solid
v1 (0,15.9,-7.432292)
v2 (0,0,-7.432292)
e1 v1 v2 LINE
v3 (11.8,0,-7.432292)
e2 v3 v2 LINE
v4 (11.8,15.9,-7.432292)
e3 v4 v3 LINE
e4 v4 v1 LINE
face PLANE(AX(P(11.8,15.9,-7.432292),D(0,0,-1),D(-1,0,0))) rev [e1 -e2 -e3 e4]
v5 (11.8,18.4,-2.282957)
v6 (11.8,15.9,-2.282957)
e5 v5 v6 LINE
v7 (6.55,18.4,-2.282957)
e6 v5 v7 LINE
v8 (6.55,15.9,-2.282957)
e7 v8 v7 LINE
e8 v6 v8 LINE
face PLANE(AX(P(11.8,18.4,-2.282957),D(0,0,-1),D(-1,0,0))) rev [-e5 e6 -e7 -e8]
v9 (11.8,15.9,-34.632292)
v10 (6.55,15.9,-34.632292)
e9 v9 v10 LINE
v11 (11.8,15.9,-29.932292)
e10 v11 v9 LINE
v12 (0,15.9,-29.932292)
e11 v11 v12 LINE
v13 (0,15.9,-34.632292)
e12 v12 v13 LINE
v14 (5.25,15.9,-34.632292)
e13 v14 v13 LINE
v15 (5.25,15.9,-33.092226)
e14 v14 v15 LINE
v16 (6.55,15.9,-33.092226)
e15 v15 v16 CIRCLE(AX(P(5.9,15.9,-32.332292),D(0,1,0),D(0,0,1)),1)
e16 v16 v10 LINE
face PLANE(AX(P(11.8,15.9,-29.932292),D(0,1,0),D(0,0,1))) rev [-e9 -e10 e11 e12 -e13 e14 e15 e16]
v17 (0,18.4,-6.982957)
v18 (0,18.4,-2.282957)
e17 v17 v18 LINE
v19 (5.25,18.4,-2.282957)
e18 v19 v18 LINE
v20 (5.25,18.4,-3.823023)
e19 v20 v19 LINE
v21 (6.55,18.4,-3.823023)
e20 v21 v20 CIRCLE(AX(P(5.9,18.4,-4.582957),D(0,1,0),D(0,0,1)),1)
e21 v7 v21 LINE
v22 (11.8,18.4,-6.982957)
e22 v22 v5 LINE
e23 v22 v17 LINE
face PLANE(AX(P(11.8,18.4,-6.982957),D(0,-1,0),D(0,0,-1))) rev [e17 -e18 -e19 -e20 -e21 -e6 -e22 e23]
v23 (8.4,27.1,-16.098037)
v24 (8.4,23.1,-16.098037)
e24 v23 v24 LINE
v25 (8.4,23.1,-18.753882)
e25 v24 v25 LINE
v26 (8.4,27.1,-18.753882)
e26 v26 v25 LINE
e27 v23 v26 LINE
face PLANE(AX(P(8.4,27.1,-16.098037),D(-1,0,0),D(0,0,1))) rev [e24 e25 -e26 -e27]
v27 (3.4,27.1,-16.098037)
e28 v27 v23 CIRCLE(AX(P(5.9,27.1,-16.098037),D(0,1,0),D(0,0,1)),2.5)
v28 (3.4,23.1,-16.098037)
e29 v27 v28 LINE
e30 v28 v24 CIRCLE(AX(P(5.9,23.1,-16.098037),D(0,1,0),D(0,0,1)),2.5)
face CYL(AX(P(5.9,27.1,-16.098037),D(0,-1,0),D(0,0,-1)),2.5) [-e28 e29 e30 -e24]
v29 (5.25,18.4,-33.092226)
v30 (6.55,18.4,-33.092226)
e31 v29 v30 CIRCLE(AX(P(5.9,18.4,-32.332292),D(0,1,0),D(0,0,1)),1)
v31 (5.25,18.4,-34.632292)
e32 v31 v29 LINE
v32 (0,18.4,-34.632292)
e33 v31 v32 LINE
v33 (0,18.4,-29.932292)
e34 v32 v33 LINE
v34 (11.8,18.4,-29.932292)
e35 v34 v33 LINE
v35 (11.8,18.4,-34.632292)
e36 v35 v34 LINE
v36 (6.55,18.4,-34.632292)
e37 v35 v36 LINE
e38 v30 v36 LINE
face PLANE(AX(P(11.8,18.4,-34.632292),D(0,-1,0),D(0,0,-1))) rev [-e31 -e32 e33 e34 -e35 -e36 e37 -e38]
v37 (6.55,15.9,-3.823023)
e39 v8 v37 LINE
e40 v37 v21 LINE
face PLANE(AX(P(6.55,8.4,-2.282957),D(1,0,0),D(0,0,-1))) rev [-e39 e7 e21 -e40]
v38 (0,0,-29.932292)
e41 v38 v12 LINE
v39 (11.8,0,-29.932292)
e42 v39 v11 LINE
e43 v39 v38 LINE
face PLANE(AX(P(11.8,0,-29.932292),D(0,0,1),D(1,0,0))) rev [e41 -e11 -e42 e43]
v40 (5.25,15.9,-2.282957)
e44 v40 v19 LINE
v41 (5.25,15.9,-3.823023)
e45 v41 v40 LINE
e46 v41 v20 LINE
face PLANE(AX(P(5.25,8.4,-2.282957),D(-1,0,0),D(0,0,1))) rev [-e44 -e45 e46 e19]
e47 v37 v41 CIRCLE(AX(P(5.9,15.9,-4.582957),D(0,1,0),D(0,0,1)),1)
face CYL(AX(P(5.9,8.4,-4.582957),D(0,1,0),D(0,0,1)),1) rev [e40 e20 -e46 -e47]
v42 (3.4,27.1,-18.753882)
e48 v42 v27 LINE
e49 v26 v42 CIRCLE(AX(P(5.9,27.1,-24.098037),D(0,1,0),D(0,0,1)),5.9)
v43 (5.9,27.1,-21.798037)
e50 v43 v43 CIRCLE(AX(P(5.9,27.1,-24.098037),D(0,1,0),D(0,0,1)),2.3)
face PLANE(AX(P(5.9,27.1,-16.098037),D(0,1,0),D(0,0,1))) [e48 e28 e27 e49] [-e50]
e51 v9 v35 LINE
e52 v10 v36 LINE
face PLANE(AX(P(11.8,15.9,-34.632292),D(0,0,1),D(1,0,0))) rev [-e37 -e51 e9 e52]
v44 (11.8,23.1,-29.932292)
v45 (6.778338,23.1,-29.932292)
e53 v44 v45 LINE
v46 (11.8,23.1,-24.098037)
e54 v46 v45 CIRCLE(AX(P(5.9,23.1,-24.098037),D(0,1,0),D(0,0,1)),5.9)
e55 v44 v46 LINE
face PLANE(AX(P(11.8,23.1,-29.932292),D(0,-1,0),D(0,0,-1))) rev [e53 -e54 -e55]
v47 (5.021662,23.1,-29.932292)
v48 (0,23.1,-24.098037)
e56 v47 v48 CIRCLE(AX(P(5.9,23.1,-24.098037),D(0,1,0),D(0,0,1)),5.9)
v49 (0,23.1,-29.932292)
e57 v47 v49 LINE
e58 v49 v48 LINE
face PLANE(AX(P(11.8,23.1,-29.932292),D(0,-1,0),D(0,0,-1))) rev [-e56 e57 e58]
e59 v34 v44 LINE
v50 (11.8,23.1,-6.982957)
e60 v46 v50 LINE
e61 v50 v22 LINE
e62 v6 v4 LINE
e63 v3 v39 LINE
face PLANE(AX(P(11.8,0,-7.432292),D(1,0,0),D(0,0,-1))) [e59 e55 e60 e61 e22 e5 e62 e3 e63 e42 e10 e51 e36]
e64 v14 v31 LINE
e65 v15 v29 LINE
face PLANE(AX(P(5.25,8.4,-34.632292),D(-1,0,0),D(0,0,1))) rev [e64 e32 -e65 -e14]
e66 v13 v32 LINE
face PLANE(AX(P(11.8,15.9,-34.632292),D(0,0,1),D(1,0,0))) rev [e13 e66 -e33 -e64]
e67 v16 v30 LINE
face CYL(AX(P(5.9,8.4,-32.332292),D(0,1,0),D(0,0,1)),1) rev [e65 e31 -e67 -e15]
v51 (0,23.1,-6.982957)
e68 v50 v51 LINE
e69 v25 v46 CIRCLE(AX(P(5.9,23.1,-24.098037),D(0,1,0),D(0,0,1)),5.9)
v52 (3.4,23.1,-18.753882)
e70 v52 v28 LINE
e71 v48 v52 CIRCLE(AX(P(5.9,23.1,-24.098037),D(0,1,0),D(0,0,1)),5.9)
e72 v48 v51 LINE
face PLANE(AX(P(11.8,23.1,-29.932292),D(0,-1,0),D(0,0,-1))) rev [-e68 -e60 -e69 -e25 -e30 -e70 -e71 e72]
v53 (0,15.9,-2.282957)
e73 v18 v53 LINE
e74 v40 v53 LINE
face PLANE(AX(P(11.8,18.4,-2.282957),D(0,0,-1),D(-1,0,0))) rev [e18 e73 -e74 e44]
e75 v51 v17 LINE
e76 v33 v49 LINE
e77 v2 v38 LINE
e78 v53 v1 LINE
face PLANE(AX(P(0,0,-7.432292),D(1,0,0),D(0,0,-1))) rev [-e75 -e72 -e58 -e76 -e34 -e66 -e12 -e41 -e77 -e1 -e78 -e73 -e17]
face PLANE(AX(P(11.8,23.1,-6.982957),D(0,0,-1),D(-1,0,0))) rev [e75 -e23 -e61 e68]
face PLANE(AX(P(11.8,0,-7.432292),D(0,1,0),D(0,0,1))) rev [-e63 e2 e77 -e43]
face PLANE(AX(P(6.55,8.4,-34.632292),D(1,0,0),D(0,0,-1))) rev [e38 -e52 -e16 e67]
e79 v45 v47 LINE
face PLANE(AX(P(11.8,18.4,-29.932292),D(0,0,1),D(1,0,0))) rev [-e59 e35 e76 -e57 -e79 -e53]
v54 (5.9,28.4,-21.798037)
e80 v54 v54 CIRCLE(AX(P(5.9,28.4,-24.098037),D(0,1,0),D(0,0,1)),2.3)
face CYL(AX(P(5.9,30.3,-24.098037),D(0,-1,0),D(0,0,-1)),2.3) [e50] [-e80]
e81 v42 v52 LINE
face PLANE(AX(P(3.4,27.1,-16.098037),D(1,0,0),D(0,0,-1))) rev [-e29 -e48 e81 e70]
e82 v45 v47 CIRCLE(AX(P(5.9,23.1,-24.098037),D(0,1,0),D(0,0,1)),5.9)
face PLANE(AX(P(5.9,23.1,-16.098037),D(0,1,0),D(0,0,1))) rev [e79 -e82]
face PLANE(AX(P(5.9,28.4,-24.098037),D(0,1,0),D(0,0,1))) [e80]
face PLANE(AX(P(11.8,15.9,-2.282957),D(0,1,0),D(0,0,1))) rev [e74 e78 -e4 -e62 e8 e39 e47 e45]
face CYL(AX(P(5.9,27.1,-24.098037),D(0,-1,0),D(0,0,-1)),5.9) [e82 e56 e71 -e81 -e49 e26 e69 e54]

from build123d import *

# Parameters (mm, degrees)
BOSS_EXTRUDE1_DEPTH   = 11.8
BOSS_EXTRUDE2_DEPTH   = 4
SKETCH4_R             = 2.3
BOSS_EXTRUDE3_DEPTH   = 3.2
SKETCH5_R             = 0.85
CUT_EXTRUDE1_DEPTH    = 1
CUT_EXTRUDE2_DEPTH    = 10
MOVER_START           = 28.4
MOVER_FACE2_OUTLINE_R = 2.3
MOVER_FACE2_DEPTH     = 1.9


# Read off the part's stored shape, not the designer's step: Mover face2
with BuildPart() as part:
    # Sketch2 → Boss-Extrude1 (new body)
    with BuildSketch(Plane(origin=(0, 0, 0), x_dir=(0, 0, -1), z_dir=(1, 0, 0))):
        Polygon((7.432291728, 0), (29.932291728, 0), (29.932291728, 15.9), (34.632291728, 15.9), (34.632291728, 18.4), (29.932291728, 18.4), (29.932291728, 23.1), (6.982957442, 23.1), (6.982957442, 18.4), (2.282957442, 18.4), (2.282957442, 15.9), (7.432291728, 15.9), align=None)
    extrude(amount=BOSS_EXTRUDE1_DEPTH)

    # Sketch3 → Boss-Extrude2 (add)
    with BuildSketch(Plane(origin=(0, 23.1, 0), x_dir=(-1, 0, 0), z_dir=(0, 1, 0))):
        with BuildLine():
            Line((-3.4, -16.098037438), (-3.4, -18.753881751))
            ThreePointArc((-3.4, -18.753881751), (-5.9, -29.998037438), (-8.4, -18.753881751))
            Line((-8.4, -18.753881751), (-8.4, -16.098037438))
            ThreePointArc((-8.4, -16.098037438), (-5.9, -13.598037438), (-3.4, -16.098037438))
        make_face()
    extrude(amount=BOSS_EXTRUDE2_DEPTH)

    # Sketch4 → Boss-Extrude3 (add)
    with BuildSketch(Plane(origin=(0, 27.1, 0), x_dir=(-1, 0, 0), z_dir=(0, 1, 0))):
        with Locations(Location((-5.9, -24.098037438, 0), (0, 0, 90))):
            Circle(SKETCH4_R)
    extrude(amount=BOSS_EXTRUDE3_DEPTH)

    # Sketch5 → Cut-Extrude1 (cut)
    with BuildSketch(Plane(origin=(0, 30.3, 0), x_dir=(1, 0, 0), z_dir=(0, 1, 0))):
        with Locations(Location((5.9, 24.098037438, 0), (0, 0, 270))):
            Circle(SKETCH5_R)
    extrude(amount=-CUT_EXTRUDE1_DEPTH, mode=Mode.SUBTRACT)

    # Sketch6 → Cut-Extrude2 (cut)
    with BuildSketch(Plane(origin=(0, 18.4, 0), x_dir=(1, 0, 0), z_dir=(0, 1, 0))):
        with BuildLine():
            Line((6.55, 2.282957442), (5.25, 2.282957442))
            Line((5.25, 2.282957442), (5.25, 3.823023234))
            ThreePointArc((5.25, 3.823023234), (5.9, 5.582957442), (6.55, 3.823023234))
            Line((6.55, 3.823023234), (6.55, 2.282957442))
        make_face()
        with BuildLine():
            Line((6.55, 34.632291728), (5.25, 34.632291728))
            Line((5.25, 34.632291728), (5.25, 33.092225935))
            ThreePointArc((5.25, 33.092225935), (5.9, 31.332291728), (6.55, 33.092225935))
            Line((6.55, 33.092225935), (6.55, 34.632291728))
        make_face()
    extrude(amount=-CUT_EXTRUDE2_DEPTH, mode=Mode.SUBTRACT)

    # Mover face2 outline → Mover face2 (cut)
    with BuildSketch(Plane(origin=(0, 0, 0), x_dir=(1, 0, 0), z_dir=(0, 1, 0)).offset(MOVER_START)):
        with Locations((5.9, 24.098037438)):
            Circle(MOVER_FACE2_OUTLINE_R)
    extrude(amount=MOVER_FACE2_DEPTH, mode=Mode.SUBTRACT)


solid = part.part
